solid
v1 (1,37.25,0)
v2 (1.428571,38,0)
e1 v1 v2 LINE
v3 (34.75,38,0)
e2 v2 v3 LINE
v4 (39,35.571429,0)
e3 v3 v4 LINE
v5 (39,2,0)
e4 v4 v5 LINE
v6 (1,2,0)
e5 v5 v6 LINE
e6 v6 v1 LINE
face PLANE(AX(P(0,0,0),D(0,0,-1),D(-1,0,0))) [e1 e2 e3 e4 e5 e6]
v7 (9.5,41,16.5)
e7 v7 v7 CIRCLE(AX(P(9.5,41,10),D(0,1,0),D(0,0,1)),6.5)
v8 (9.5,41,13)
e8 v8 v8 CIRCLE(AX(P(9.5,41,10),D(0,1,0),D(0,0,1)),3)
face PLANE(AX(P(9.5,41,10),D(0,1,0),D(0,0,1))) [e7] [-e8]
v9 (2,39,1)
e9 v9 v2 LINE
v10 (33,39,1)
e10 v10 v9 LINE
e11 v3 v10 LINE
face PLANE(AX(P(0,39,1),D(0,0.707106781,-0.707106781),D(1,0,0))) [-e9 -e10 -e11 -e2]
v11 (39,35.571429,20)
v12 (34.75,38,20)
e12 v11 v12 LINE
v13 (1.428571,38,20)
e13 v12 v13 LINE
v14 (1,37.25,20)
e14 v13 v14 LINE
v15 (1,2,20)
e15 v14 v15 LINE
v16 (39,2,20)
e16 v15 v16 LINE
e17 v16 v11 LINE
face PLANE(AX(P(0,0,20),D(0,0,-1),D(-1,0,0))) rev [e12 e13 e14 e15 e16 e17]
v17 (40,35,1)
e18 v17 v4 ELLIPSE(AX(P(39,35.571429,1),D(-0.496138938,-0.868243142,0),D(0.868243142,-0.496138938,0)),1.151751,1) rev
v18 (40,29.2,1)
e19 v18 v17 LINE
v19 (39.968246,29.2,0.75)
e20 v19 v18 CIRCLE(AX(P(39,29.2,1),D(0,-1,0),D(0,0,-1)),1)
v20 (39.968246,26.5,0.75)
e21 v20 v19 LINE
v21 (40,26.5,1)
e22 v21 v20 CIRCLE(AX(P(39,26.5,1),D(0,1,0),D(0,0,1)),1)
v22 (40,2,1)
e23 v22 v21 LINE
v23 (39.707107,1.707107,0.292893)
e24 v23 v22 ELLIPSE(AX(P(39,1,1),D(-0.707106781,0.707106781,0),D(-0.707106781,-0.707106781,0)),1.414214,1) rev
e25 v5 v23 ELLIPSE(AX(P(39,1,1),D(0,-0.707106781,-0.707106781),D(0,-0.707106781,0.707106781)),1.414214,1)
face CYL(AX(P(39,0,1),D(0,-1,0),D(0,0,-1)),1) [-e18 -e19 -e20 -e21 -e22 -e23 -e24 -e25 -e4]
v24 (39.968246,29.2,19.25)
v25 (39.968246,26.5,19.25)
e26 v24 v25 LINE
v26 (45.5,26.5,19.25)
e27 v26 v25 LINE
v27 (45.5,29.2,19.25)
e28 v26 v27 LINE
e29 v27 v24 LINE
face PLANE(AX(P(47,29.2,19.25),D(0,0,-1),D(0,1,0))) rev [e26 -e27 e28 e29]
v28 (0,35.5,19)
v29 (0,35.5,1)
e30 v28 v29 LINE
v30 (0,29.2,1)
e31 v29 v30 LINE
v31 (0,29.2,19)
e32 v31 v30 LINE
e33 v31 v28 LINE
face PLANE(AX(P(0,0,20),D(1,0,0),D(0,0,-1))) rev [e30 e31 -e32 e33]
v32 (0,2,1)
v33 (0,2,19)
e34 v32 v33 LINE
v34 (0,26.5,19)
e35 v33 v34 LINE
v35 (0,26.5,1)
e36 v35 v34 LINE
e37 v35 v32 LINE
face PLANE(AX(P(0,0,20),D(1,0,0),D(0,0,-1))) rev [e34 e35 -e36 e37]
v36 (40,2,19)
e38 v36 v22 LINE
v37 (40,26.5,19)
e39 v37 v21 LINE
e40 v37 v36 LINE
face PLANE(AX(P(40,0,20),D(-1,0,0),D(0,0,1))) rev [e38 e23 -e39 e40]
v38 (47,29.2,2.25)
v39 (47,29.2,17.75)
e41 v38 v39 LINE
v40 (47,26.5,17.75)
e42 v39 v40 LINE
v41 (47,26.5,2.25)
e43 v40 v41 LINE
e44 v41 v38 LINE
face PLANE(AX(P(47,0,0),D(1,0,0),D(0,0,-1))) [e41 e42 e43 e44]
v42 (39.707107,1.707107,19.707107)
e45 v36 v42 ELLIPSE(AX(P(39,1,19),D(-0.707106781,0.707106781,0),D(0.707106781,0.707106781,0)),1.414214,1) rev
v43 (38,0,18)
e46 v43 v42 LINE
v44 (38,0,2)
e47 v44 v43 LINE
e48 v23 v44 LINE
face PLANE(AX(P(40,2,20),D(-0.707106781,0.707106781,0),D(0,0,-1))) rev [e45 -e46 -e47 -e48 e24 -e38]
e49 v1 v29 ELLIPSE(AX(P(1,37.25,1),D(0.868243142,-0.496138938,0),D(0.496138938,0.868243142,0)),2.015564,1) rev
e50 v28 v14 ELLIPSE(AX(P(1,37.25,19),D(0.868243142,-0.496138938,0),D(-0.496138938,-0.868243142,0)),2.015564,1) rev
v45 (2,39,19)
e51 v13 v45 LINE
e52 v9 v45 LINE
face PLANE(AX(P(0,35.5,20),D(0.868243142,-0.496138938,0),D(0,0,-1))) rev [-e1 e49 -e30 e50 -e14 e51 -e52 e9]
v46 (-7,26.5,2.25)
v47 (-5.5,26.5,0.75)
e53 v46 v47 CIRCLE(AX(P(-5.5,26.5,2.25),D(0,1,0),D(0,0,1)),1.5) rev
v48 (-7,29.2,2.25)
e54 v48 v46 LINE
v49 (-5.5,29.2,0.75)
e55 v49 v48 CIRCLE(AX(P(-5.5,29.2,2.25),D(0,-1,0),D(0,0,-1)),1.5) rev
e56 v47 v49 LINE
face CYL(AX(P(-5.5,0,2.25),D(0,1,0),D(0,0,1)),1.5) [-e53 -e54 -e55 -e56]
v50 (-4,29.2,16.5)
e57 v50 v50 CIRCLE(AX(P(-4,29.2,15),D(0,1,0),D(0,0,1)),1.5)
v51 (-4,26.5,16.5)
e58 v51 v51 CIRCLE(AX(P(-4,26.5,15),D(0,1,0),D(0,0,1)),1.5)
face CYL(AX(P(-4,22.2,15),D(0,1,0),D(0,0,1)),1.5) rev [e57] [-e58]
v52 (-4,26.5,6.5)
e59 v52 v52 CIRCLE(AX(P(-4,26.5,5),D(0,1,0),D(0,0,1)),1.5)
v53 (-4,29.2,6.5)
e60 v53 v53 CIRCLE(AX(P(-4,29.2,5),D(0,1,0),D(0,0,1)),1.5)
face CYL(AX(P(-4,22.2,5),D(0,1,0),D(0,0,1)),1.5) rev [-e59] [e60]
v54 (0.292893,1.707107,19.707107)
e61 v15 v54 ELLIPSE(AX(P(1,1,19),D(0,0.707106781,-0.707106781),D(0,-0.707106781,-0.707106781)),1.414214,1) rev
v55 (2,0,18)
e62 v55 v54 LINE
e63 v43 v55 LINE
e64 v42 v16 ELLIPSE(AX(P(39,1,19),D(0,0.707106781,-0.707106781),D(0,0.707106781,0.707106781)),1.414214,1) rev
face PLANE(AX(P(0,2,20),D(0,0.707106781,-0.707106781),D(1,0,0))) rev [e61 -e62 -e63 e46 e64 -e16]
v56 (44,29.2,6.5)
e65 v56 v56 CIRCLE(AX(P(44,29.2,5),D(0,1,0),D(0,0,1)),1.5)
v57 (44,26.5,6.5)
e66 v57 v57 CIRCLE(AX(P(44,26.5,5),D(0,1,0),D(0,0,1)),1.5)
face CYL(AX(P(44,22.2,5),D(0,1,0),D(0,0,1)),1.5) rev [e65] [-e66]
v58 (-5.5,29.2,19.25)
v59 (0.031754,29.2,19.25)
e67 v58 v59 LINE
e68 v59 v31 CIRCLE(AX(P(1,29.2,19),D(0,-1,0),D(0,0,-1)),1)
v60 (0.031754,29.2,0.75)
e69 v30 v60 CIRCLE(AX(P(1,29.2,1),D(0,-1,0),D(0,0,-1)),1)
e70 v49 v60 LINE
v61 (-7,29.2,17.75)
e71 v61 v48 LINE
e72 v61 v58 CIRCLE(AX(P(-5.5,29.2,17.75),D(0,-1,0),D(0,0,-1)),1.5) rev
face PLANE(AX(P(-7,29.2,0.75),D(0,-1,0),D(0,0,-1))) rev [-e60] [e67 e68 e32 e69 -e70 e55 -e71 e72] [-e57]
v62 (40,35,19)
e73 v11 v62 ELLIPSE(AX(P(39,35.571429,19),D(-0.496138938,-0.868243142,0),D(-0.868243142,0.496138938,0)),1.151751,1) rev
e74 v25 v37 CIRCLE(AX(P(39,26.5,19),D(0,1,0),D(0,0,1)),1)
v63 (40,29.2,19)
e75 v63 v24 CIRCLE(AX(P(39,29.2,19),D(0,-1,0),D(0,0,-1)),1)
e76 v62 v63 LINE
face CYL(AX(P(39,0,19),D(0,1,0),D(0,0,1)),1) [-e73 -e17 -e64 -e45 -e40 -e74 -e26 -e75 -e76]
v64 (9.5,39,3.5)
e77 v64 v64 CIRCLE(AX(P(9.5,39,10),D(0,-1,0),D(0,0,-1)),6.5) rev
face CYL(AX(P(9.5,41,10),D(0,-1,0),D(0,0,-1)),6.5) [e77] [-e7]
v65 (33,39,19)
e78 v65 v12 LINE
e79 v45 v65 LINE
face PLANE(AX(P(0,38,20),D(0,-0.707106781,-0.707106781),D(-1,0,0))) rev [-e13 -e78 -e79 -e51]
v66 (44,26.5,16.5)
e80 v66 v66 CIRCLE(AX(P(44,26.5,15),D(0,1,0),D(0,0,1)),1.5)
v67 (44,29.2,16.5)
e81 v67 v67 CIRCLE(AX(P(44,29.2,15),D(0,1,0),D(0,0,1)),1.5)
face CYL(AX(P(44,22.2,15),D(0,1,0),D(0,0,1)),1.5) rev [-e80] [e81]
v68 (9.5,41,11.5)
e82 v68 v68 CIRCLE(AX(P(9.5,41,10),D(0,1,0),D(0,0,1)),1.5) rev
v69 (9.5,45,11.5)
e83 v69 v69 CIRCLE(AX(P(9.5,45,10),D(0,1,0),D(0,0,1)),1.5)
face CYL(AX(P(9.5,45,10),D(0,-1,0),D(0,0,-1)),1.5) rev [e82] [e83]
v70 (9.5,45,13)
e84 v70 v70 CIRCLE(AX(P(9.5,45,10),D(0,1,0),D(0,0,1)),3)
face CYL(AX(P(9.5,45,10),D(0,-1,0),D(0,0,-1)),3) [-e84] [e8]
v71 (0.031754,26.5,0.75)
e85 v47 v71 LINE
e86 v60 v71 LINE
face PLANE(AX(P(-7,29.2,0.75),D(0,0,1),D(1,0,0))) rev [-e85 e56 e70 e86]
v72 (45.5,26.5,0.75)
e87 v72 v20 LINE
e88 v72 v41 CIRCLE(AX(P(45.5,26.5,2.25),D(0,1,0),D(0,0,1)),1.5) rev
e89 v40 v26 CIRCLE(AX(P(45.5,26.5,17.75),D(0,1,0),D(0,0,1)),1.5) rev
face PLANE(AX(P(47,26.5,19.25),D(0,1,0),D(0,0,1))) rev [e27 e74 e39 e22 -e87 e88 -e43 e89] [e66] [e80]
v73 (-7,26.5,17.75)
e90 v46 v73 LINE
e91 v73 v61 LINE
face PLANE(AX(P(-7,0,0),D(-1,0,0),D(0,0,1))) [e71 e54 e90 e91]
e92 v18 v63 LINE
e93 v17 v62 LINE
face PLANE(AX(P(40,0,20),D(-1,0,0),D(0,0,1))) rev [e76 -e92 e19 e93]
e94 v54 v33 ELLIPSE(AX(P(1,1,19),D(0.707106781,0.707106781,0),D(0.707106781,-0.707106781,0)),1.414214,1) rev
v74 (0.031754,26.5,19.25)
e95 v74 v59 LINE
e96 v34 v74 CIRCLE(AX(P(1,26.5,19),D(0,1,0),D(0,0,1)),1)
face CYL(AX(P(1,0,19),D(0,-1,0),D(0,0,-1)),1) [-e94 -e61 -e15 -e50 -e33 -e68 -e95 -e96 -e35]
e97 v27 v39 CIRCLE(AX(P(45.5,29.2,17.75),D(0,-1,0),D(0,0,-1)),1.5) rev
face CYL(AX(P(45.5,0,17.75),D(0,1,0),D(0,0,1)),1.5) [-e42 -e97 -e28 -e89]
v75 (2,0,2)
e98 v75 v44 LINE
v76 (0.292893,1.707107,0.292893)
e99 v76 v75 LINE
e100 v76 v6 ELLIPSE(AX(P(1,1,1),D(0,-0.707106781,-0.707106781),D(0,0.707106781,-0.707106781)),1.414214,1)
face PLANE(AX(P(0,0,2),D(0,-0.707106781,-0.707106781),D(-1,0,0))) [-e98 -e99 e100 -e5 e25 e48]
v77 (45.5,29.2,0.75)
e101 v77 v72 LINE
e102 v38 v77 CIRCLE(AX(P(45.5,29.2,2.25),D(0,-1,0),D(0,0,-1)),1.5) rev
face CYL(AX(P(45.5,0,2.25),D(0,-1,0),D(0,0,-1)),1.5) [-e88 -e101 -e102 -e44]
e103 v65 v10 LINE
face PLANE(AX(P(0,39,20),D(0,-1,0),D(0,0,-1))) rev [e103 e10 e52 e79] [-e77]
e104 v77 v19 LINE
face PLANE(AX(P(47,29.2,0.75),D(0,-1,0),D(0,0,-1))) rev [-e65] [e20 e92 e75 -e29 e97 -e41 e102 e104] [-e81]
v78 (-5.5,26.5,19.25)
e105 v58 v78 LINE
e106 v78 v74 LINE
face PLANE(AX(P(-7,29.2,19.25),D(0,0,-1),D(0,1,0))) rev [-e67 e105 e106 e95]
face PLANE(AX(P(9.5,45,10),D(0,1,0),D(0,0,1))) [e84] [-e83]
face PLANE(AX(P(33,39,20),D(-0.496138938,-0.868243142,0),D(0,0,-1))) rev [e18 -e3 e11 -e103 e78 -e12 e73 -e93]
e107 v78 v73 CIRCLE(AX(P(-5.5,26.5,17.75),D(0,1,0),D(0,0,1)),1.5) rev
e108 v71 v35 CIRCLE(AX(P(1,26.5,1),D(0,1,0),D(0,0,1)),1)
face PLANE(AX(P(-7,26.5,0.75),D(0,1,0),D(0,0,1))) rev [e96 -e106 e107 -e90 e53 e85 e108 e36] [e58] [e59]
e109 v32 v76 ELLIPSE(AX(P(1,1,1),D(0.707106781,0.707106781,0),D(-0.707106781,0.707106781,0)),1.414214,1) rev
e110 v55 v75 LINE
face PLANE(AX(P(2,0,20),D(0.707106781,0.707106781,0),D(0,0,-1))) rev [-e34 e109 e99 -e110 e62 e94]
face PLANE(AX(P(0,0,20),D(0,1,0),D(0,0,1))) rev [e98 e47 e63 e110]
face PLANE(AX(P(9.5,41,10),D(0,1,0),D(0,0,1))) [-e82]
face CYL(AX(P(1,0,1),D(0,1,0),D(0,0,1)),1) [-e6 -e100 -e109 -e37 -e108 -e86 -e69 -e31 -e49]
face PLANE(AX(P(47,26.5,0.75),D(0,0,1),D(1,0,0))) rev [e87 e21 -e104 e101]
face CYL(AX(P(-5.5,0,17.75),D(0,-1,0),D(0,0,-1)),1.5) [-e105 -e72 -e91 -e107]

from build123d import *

# Parameters (mm, degrees)
SKETCH_1_W          = 40
SKETCH_1_H          = 39
EXTRUDE_1_DEPTH     = 20
SKETCH_2_W          = 18.5
SKETCH_2_H          = 2.7
EXTRUDE_2_DEPTH     = 7
SKETCH_3_W          = 18.5
SKETCH_3_H          = 2.7
EXTRUDE_3_DEPTH     = 7
SKETCH_4_R          = 1.5
CUT_EXTRUDE_1_DEPTH = 7
CHAMFER_1_SIZE      = 2
CHAMFER_2_SIZE      = 2
CHAMFER_2_SIZE2     = 3.5
CHAMFER_3_SIZE      = 4
CHAMFER_3_SIZE2     = 7
CHAMFER_4_SIZE      = 1
SKETCH_5_R          = 6.5
EXTRUDE_4_DEPTH     = 2
SKETCH_6_R          = 3
SKETCH_6_R_2        = 1.5
EXTRUDE_5_DEPTH     = 4
FILLET_1_R          = 1.5
FILLET_2_R          = 1


with BuildPart() as part:
    # 草图1 → 凸台-拉伸1 (new body)
    with BuildSketch(Plane.XY):
        with Locations((20, 19.5)):
            Rectangle(SKETCH_1_W, SKETCH_1_H)
    extrude(amount=EXTRUDE_1_DEPTH)

    # 草图2 → 凸台-拉伸2 (add)
    with BuildSketch(Plane.ZY):
        with Locations((10, 27.85)):
            Rectangle(SKETCH_2_W, SKETCH_2_H)
    extrude(amount=EXTRUDE_2_DEPTH)

    # 草图3 → 凸台-拉伸3 (add)
    with BuildSketch(Plane(origin=(40, 0, 0), x_dir=(0, 0, -1), z_dir=(1, 0, 0))):
        with Locations((-10, 27.85)):
            Rectangle(SKETCH_3_W, SKETCH_3_H)
    extrude(amount=EXTRUDE_3_DEPTH)

    # 草图4 → 切除-拉伸1 (cut)
    with BuildSketch(Plane(origin=(0, 29.2, 0), x_dir=(1, 0, 0), z_dir=(0, 1, 0))):
        with Locations(Location((-4, -5, 0), (0, 0, 270))):
            Circle(SKETCH_4_R)
        with Locations(Location((44, -5, 0), (0, 0, 270))):
            Circle(SKETCH_4_R)
        with Locations(Location((-4, -15, 0), (0, 0, 270))):
            Circle(SKETCH_4_R)
        with Locations(Location((44, -15, 0), (0, 0, 270))):
            Circle(SKETCH_4_R)
    extrude(amount=-CUT_EXTRUDE_1_DEPTH, mode=Mode.SUBTRACT)

    # 倒角1
    chamfer_1_edges = [part.edges().sort_by_distance(p)[0] for p in [
        (20, 0, 0),
        (40, 0, 10),
        (0, 0, 10),
        (20, 0, 20),
    ]]
    chamfer(chamfer_1_edges, length=CHAMFER_1_SIZE)

    # 倒角2
    chamfer_2_edges = [part.edges().sort_by_distance(p)[0] for p in [
        (0, 39, 10),
    ]]
    chamfer_2_side = [part.faces().sort_by_distance(p)[0] for p in [
        (20, 39, 10),
    ]]
    chamfer(chamfer_2_edges, length=CHAMFER_2_SIZE, length2=CHAMFER_2_SIZE2, reference=chamfer_2_side[0])

    # 倒角3
    chamfer_3_edges = [part.edges().sort_by_distance(p)[0] for p in [
        (40, 39, 10),
    ]]
    chamfer_3_side = [part.faces().sort_by_distance(p)[0] for p in [
        (40, 19.967962466, 10),
    ]]
    chamfer(chamfer_3_edges, length=CHAMFER_3_SIZE, length2=CHAMFER_3_SIZE2, reference=chamfer_3_side[0])

    # 倒角4
    chamfer_4_edges = [part.edges().sort_by_distance(p)[0] for p in [
        (17.5, 39, 0),
        (17.5, 39, 20),
    ]]
    chamfer(chamfer_4_edges, length=CHAMFER_4_SIZE)

    # 草图5 → 凸台-拉伸4 (add)
    with BuildSketch(Plane(origin=(0, 39, 0), x_dir=(1, 0, 0), z_dir=(0, 1, 0))):
        with Locations(Location((9.5, -10, 0), (0, 0, 90))):
            Circle(SKETCH_5_R)
    extrude(amount=EXTRUDE_4_DEPTH)

    # 草图6 → 凸台-拉伸5 (add)
    with BuildSketch(Plane(origin=(0, 41, 0), x_dir=(1, 0, 0), z_dir=(0, 1, 0))):
        with Locations(Location((9.5, -10, 0), (0, 0, 270))):
            Circle(SKETCH_6_R)
        with Locations(Location((9.5, -10, 0), (0, 0, 270))):
            Circle(SKETCH_6_R_2, mode=Mode.SUBTRACT)
    extrude(amount=EXTRUDE_5_DEPTH)

    # 圆角1
    fillet_1_edges = [part.edges().sort_by_distance(p)[0] for p in [
        (-7, 27.85, 0.75),
        (-7, 27.85, 19.25),
        (47, 27.85, 19.25),
        (47, 27.85, 0.75),
    ]]
    fillet(fillet_1_edges, radius=FILLET_1_R)

    # 圆角2
    # the kernel refuses this fillet: 1 mm, written as the material it takes off along each edge
    with BuildSketch(Plane(origin=(0, 38, 20), x_dir=(1, 0, 0), z_dir=(0, -1, 0))) as fillet_2_piece_1_section:
        with BuildLine():
            CenterArc((FILLET_2_R, -FILLET_2_R), FILLET_2_R, 90, 90)
            Line((0, -FILLET_2_R), (0, 0))
            Line((0, 0), (FILLET_2_R, 0))
        make_face()
    fillet_2_piece_1 = extrude(amount=38.5, mode=Mode.PRIVATE)
    fillet_2_piece_1 = split(fillet_2_piece_1, bisect_by=Plane(origin=(0.233478453, 29.2, 19.792941909), z_dir=(0, 1, 0)), keep=Keep.TOP, mode=Mode.PRIVATE)
    fillet_2_piece_1 = split(fillet_2_piece_1, bisect_by=Plane(origin=(0.233478453, 33.6, 19.25), z_dir=(0, 0, 1)), keep=Keep.TOP, mode=Mode.PRIVATE)
    add(fillet_2_piece_1, mode=Mode.SUBTRACT)
    with BuildSketch(Plane(origin=(0, 38, 20), x_dir=(1, 0, 0), z_dir=(0, -1, 0))) as fillet_2_piece_2_section:
        with BuildLine():
            CenterArc((FILLET_2_R, -FILLET_2_R), FILLET_2_R, 90, 90)
            Line((0, -FILLET_2_R), (0, 0))
            Line((0, 0), (FILLET_2_R, 0))
        make_face()
    fillet_2_piece_2 = extrude(amount=38.5, mode=Mode.PRIVATE)
    fillet_2_piece_2 = split(fillet_2_piece_2, bisect_by=Plane(origin=(-0.003280029, 29.2, 19.146607635), z_dir=(0, 1, 0)), keep=Keep.TOP, mode=Mode.PRIVATE)
    fillet_2_piece_2 = split(fillet_2_piece_2, bisect_by=Plane(origin=(-0.003280029, 33.6, 19.25), z_dir=(0, 0, -1)), keep=Keep.TOP, mode=Mode.PRIVATE)
    add(fillet_2_piece_2, mode=Mode.SUBTRACT)
    with BuildSketch(Plane(origin=(0, 38, 20), x_dir=(1, 0, 0), z_dir=(0, -1, 0))) as fillet_2_piece_3_section:
        with BuildLine():
            CenterArc((FILLET_2_R, -FILLET_2_R), FILLET_2_R, 90, 90)
            Line((0, -FILLET_2_R), (0, 0))
            Line((0, 0), (FILLET_2_R, 0))
        make_face()
    fillet_2_piece_3 = extrude(amount=38.5, mode=Mode.PRIVATE)
    fillet_2_piece_3 = split(fillet_2_piece_3, bisect_by=Plane(origin=(0.233478453, 29.2, 19.792941909), z_dir=(0, -1, 0)), keep=Keep.TOP, mode=Mode.PRIVATE)
    fillet_2_piece_3 = split(fillet_2_piece_3, bisect_by=Plane(origin=(0.233478453, 27.85, 19.25), z_dir=(0, 0, 1)), keep=Keep.TOP, mode=Mode.PRIVATE)
    fillet_2_piece_3 = split(fillet_2_piece_3, bisect_by=Plane(origin=(0.233478453, 26.5, 19.792941909), z_dir=(0, 1, 0)), keep=Keep.TOP, mode=Mode.PRIVATE)
    add(fillet_2_piece_3, mode=Mode.SUBTRACT)
    with BuildSketch(Plane(origin=(0, 38, 20), x_dir=(1, 0, 0), z_dir=(0, -1, 0))) as fillet_2_piece_4_section:
        with BuildLine():
            CenterArc((FILLET_2_R, -FILLET_2_R), FILLET_2_R, 90, 90)
            Line((0, -FILLET_2_R), (0, 0))
            Line((0, 0), (FILLET_2_R, 0))
        make_face()
    fillet_2_piece_4 = extrude(amount=38.5, mode=Mode.PRIVATE)
    fillet_2_piece_4 = split(fillet_2_piece_4, bisect_by=Plane(origin=(0.233478453, 13, 19.25), z_dir=(0, 0, 1)), keep=Keep.TOP, mode=Mode.PRIVATE)
    fillet_2_piece_4 = split(fillet_2_piece_4, bisect_by=Plane(origin=(0.233478453, 26.5, 19.792941909), z_dir=(0, -1, 0)), keep=Keep.TOP, mode=Mode.PRIVATE)
    add(fillet_2_piece_4, mode=Mode.SUBTRACT)
    with BuildSketch(Plane(origin=(0, 38, 20), x_dir=(1, 0, 0), z_dir=(0, -1, 0))) as fillet_2_piece_5_section:
        with BuildLine():
            CenterArc((FILLET_2_R, -FILLET_2_R), FILLET_2_R, 90, 90)
            Line((0, -FILLET_2_R), (0, 0))
            Line((0, 0), (FILLET_2_R, 0))
        make_face()
    fillet_2_piece_5 = extrude(amount=38.5, mode=Mode.PRIVATE)
    fillet_2_piece_5 = split(fillet_2_piece_5, bisect_by=Plane(origin=(-0.003280029, 13, 19.25), z_dir=(0, 0, -1)), keep=Keep.TOP, mode=Mode.PRIVATE)
    fillet_2_piece_5 = split(fillet_2_piece_5, bisect_by=Plane(origin=(-0.003280029, 26.5, 19.146607635), z_dir=(0, -1, 0)), keep=Keep.TOP, mode=Mode.PRIVATE)
    add(fillet_2_piece_5, mode=Mode.SUBTRACT)
    with BuildSketch(Plane(origin=(0, 38, 0), x_dir=(1, 0, 0), z_dir=(0, -1, 0))) as fillet_2_piece_6_section:
        with BuildLine():
            CenterArc((FILLET_2_R, FILLET_2_R), FILLET_2_R, 180, 90)
            Line((0, FILLET_2_R), (0, 0))
            Line((0, 0), (FILLET_2_R, 0))
        make_face()
    fillet_2_piece_6 = extrude(amount=38.5, mode=Mode.PRIVATE)
    fillet_2_piece_6 = split(fillet_2_piece_6, bisect_by=Plane(origin=(0.233478453, 29.2, 0.207058091), z_dir=(0, 1, 0)), keep=Keep.TOP, mode=Mode.PRIVATE)
    fillet_2_piece_6 = split(fillet_2_piece_6, bisect_by=Plane(origin=(0.233478453, 33.6, 0.75), z_dir=(0, 0, -1)), keep=Keep.TOP, mode=Mode.PRIVATE)
    add(fillet_2_piece_6, mode=Mode.SUBTRACT)
    with BuildSketch(Plane(origin=(0, 38, 0), x_dir=(1, 0, 0), z_dir=(0, -1, 0))) as fillet_2_piece_7_section:
        with BuildLine():
            CenterArc((FILLET_2_R, FILLET_2_R), FILLET_2_R, 180, 90)
            Line((0, FILLET_2_R), (0, 0))
            Line((0, 0), (FILLET_2_R, 0))
        make_face()
    fillet_2_piece_7 = extrude(amount=38.5, mode=Mode.PRIVATE)
    fillet_2_piece_7 = split(fillet_2_piece_7, bisect_by=Plane(origin=(-0.003280029, 29.2, 0.853392365), z_dir=(0, 1, 0)), keep=Keep.TOP, mode=Mode.PRIVATE)
    fillet_2_piece_7 = split(fillet_2_piece_7, bisect_by=Plane(origin=(-0.003280029, 33.6, 0.75), z_dir=(0, 0, 1)), keep=Keep.TOP, mode=Mode.PRIVATE)
    add(fillet_2_piece_7, mode=Mode.SUBTRACT)
    with BuildSketch(Plane(origin=(0, 38, 0), x_dir=(1, 0, 0), z_dir=(0, -1, 0))) as fillet_2_piece_8_section:
        with BuildLine():
            CenterArc((FILLET_2_R, FILLET_2_R), FILLET_2_R, 180, 90)
            Line((0, FILLET_2_R), (0, 0))
            Line((0, 0), (FILLET_2_R, 0))
        make_face()
    fillet_2_piece_8 = extrude(amount=38.5, mode=Mode.PRIVATE)
    fillet_2_piece_8 = split(fillet_2_piece_8, bisect_by=Plane(origin=(0.233478453, 29.2, 0.207058091), z_dir=(0, -1, 0)), keep=Keep.TOP, mode=Mode.PRIVATE)
    fillet_2_piece_8 = split(fillet_2_piece_8, bisect_by=Plane(origin=(0.233478453, 26.5, 0.207058091), z_dir=(0, 1, 0)), keep=Keep.TOP, mode=Mode.PRIVATE)
    fillet_2_piece_8 = split(fillet_2_piece_8, bisect_by=Plane(origin=(0.233478453, 27.85, 0.75), z_dir=(0, 0, -1)), keep=Keep.TOP, mode=Mode.PRIVATE)
    add(fillet_2_piece_8, mode=Mode.SUBTRACT)
    with BuildSketch(Plane(origin=(0, 38, 0), x_dir=(1, 0, 0), z_dir=(0, -1, 0))) as fillet_2_piece_9_section:
        with BuildLine():
            CenterArc((FILLET_2_R, FILLET_2_R), FILLET_2_R, 180, 90)
            Line((0, FILLET_2_R), (0, 0))
            Line((0, 0), (FILLET_2_R, 0))
        make_face()
    fillet_2_piece_9 = extrude(amount=38.5, mode=Mode.PRIVATE)
    fillet_2_piece_9 = split(fillet_2_piece_9, bisect_by=Plane(origin=(0.233478453, 26.5, 0.207058091), z_dir=(0, -1, 0)), keep=Keep.TOP, mode=Mode.PRIVATE)
    fillet_2_piece_9 = split(fillet_2_piece_9, bisect_by=Plane(origin=(0.233478453, 13, 0.75), z_dir=(0, 0, -1)), keep=Keep.TOP, mode=Mode.PRIVATE)
    add(fillet_2_piece_9, mode=Mode.SUBTRACT)
    with BuildSketch(Plane(origin=(0, 38, 0), x_dir=(1, 0, 0), z_dir=(0, -1, 0))) as fillet_2_piece_10_section:
        with BuildLine():
            CenterArc((FILLET_2_R, FILLET_2_R), FILLET_2_R, 180, 90)
            Line((0, FILLET_2_R), (0, 0))
            Line((0, 0), (FILLET_2_R, 0))
        make_face()
    fillet_2_piece_10 = extrude(amount=38.5, mode=Mode.PRIVATE)
    fillet_2_piece_10 = split(fillet_2_piece_10, bisect_by=Plane(origin=(-0.003280029, 26.5, 0.853392365), z_dir=(0, -1, 0)), keep=Keep.TOP, mode=Mode.PRIVATE)
    fillet_2_piece_10 = split(fillet_2_piece_10, bisect_by=Plane(origin=(-0.003280029, 13, 0.75), z_dir=(0, 0, 1)), keep=Keep.TOP, mode=Mode.PRIVATE)
    add(fillet_2_piece_10, mode=Mode.SUBTRACT)
    with BuildSketch(Plane(origin=(40, -0.5, 0), x_dir=(0, 0, 1), z_dir=(0, 1, 0))) as fillet_2_piece_11_section:
        with BuildLine():
            CenterArc((FILLET_2_R, -FILLET_2_R), FILLET_2_R, 90, 90)
            Line((0, -FILLET_2_R), (0, 0))
            Line((0, 0), (FILLET_2_R, 0))
        make_face()
    fillet_2_piece_11 = extrude(amount=38, mode=Mode.PRIVATE)
    fillet_2_piece_11 = split(fillet_2_piece_11, bisect_by=Plane(origin=(40.003280029, 26.5, 0.853392365), z_dir=(0, -1, 0)), keep=Keep.TOP, mode=Mode.PRIVATE)
    fillet_2_piece_11 = split(fillet_2_piece_11, bisect_by=Plane(origin=(40.003280029, 13, 0.75), z_dir=(0, 0, 1)), keep=Keep.TOP, mode=Mode.PRIVATE)
    add(fillet_2_piece_11, mode=Mode.SUBTRACT)
    with BuildSketch(Plane(origin=(40, -0.5, 0), x_dir=(0, 0, 1), z_dir=(0, 1, 0))) as fillet_2_piece_12_section:
        with BuildLine():
            CenterArc((FILLET_2_R, -FILLET_2_R), FILLET_2_R, 90, 90)
            Line((0, -FILLET_2_R), (0, 0))
            Line((0, 0), (FILLET_2_R, 0))
        make_face()
    fillet_2_piece_12 = extrude(amount=38, mode=Mode.PRIVATE)
    fillet_2_piece_12 = split(fillet_2_piece_12, bisect_by=Plane(origin=(39.766521547, 26.5, 0.207058091), z_dir=(0, -1, 0)), keep=Keep.TOP, mode=Mode.PRIVATE)
    fillet_2_piece_12 = split(fillet_2_piece_12, bisect_by=Plane(origin=(39.766521547, 13, 0.75), z_dir=(0, 0, -1)), keep=Keep.TOP, mode=Mode.PRIVATE)
    add(fillet_2_piece_12, mode=Mode.SUBTRACT)
    with BuildSketch(Plane(origin=(40, -0.5, 0), x_dir=(0, 0, 1), z_dir=(0, 1, 0))) as fillet_2_piece_13_section:
        with BuildLine():
            CenterArc((FILLET_2_R, -FILLET_2_R), FILLET_2_R, 90, 90)
            Line((0, -FILLET_2_R), (0, 0))
            Line((0, 0), (FILLET_2_R, 0))
        make_face()
    fillet_2_piece_13 = extrude(amount=38, mode=Mode.PRIVATE)
    fillet_2_piece_13 = split(fillet_2_piece_13, bisect_by=Plane(origin=(39.766521547, 26.5, 0.207058091), z_dir=(0, 1, 0)), keep=Keep.TOP, mode=Mode.PRIVATE)
    fillet_2_piece_13 = split(fillet_2_piece_13, bisect_by=Plane(origin=(39.766521547, 29.2, 0.207058091), z_dir=(0, -1, 0)), keep=Keep.TOP, mode=Mode.PRIVATE)
    fillet_2_piece_13 = split(fillet_2_piece_13, bisect_by=Plane(origin=(39.766521547, 27.85, 0.75), z_dir=(0, 0, -1)), keep=Keep.TOP, mode=Mode.PRIVATE)
    add(fillet_2_piece_13, mode=Mode.SUBTRACT)
    with BuildSketch(Plane(origin=(40, -0.5, 0), x_dir=(0, 0, 1), z_dir=(0, 1, 0))) as fillet_2_piece_14_section:
        with BuildLine():
            CenterArc((FILLET_2_R, -FILLET_2_R), FILLET_2_R, 90, 90)
            Line((0, -FILLET_2_R), (0, 0))
            Line((0, 0), (FILLET_2_R, 0))
        make_face()
    fillet_2_piece_14 = extrude(amount=38, mode=Mode.PRIVATE)
    fillet_2_piece_14 = split(fillet_2_piece_14, bisect_by=Plane(origin=(40.003280029, 29.2, 0.853392365), z_dir=(0, 1, 0)), keep=Keep.TOP, mode=Mode.PRIVATE)
    fillet_2_piece_14 = split(fillet_2_piece_14, bisect_by=Plane(origin=(40.003280029, 33.35, 0.75), z_dir=(0, 0, 1)), keep=Keep.TOP, mode=Mode.PRIVATE)
    add(fillet_2_piece_14, mode=Mode.SUBTRACT)
    with BuildSketch(Plane(origin=(40, -0.5, 0), x_dir=(0, 0, 1), z_dir=(0, 1, 0))) as fillet_2_piece_15_section:
        with BuildLine():
            CenterArc((FILLET_2_R, -FILLET_2_R), FILLET_2_R, 90, 90)
            Line((0, -FILLET_2_R), (0, 0))
            Line((0, 0), (FILLET_2_R, 0))
        make_face()
    fillet_2_piece_15 = extrude(amount=38, mode=Mode.PRIVATE)
    fillet_2_piece_15 = split(fillet_2_piece_15, bisect_by=Plane(origin=(39.766521547, 29.2, 0.207058091), z_dir=(0, 1, 0)), keep=Keep.TOP, mode=Mode.PRIVATE)
    fillet_2_piece_15 = split(fillet_2_piece_15, bisect_by=Plane(origin=(39.766521547, 33.35, 0.75), z_dir=(0, 0, -1)), keep=Keep.TOP, mode=Mode.PRIVATE)
    add(fillet_2_piece_15, mode=Mode.SUBTRACT)
    with BuildSketch(Plane(origin=(40, -0.5, 20), x_dir=(0, 0, -1), z_dir=(0, 1, 0))) as fillet_2_piece_16_section:
        with BuildLine():
            CenterArc((FILLET_2_R, FILLET_2_R), FILLET_2_R, 180, 90)
            Line((0, FILLET_2_R), (0, 0))
            Line((0, 0), (FILLET_2_R, 0))
        make_face()
    fillet_2_piece_16 = extrude(amount=38, mode=Mode.PRIVATE)
    fillet_2_piece_16 = split(fillet_2_piece_16, bisect_by=Plane(origin=(40.003280029, 26.5, 19.146607635), z_dir=(0, -1, 0)), keep=Keep.TOP, mode=Mode.PRIVATE)
    fillet_2_piece_16 = split(fillet_2_piece_16, bisect_by=Plane(origin=(40.003280029, 13, 19.25), z_dir=(0, 0, -1)), keep=Keep.TOP, mode=Mode.PRIVATE)
    add(fillet_2_piece_16, mode=Mode.SUBTRACT)
    with BuildSketch(Plane(origin=(40, -0.5, 20), x_dir=(0, 0, -1), z_dir=(0, 1, 0))) as fillet_2_piece_17_section:
        with BuildLine():
            CenterArc((FILLET_2_R, FILLET_2_R), FILLET_2_R, 180, 90)
            Line((0, FILLET_2_R), (0, 0))
            Line((0, 0), (FILLET_2_R, 0))
        make_face()
    fillet_2_piece_17 = extrude(amount=38, mode=Mode.PRIVATE)
    fillet_2_piece_17 = split(fillet_2_piece_17, bisect_by=Plane(origin=(39.766521547, 26.5, 19.792941909), z_dir=(0, -1, 0)), keep=Keep.TOP, mode=Mode.PRIVATE)
    fillet_2_piece_17 = split(fillet_2_piece_17, bisect_by=Plane(origin=(39.766521547, 13, 19.25), z_dir=(0, 0, 1)), keep=Keep.TOP, mode=Mode.PRIVATE)
    add(fillet_2_piece_17, mode=Mode.SUBTRACT)
    with BuildSketch(Plane(origin=(40, -0.5, 20), x_dir=(0, 0, -1), z_dir=(0, 1, 0))) as fillet_2_piece_18_section:
        with BuildLine():
            CenterArc((FILLET_2_R, FILLET_2_R), FILLET_2_R, 180, 90)
            Line((0, FILLET_2_R), (0, 0))
            Line((0, 0), (FILLET_2_R, 0))
        make_face()
    fillet_2_piece_18 = extrude(amount=38, mode=Mode.PRIVATE)
    fillet_2_piece_18 = split(fillet_2_piece_18, bisect_by=Plane(origin=(39.766521547, 26.5, 19.792941909), z_dir=(0, 1, 0)), keep=Keep.TOP, mode=Mode.PRIVATE)
    fillet_2_piece_18 = split(fillet_2_piece_18, bisect_by=Plane(origin=(39.766521547, 27.85, 19.25), z_dir=(0, 0, 1)), keep=Keep.TOP, mode=Mode.PRIVATE)
    fillet_2_piece_18 = split(fillet_2_piece_18, bisect_by=Plane(origin=(39.766521547, 29.2, 19.792941909), z_dir=(0, -1, 0)), keep=Keep.TOP, mode=Mode.PRIVATE)
    add(fillet_2_piece_18, mode=Mode.SUBTRACT)
    with BuildSketch(Plane(origin=(40, -0.5, 20), x_dir=(0, 0, -1), z_dir=(0, 1, 0))) as fillet_2_piece_19_section:
        with BuildLine():
            CenterArc((FILLET_2_R, FILLET_2_R), FILLET_2_R, 180, 90)
            Line((0, FILLET_2_R), (0, 0))
            Line((0, 0), (FILLET_2_R, 0))
        make_face()
    fillet_2_piece_19 = extrude(amount=38, mode=Mode.PRIVATE)
    fillet_2_piece_19 = split(fillet_2_piece_19, bisect_by=Plane(origin=(40.003280029, 33.35, 19.25), z_dir=(0, 0, -1)), keep=Keep.TOP, mode=Mode.PRIVATE)
    fillet_2_piece_19 = split(fillet_2_piece_19, bisect_by=Plane(origin=(40.003280029, 29.2, 19.146607635), z_dir=(0, 1, 0)), keep=Keep.TOP, mode=Mode.PRIVATE)
    add(fillet_2_piece_19, mode=Mode.SUBTRACT)
    with BuildSketch(Plane(origin=(40, -0.5, 20), x_dir=(0, 0, -1), z_dir=(0, 1, 0))) as fillet_2_piece_20_section:
        with BuildLine():
            CenterArc((FILLET_2_R, FILLET_2_R), FILLET_2_R, 180, 90)
            Line((0, FILLET_2_R), (0, 0))
            Line((0, 0), (FILLET_2_R, 0))
        make_face()
    fillet_2_piece_20 = extrude(amount=38, mode=Mode.PRIVATE)
    fillet_2_piece_20 = split(fillet_2_piece_20, bisect_by=Plane(origin=(39.766521547, 33.35, 19.25), z_dir=(0, 0, 1)), keep=Keep.TOP, mode=Mode.PRIVATE)
    fillet_2_piece_20 = split(fillet_2_piece_20, bisect_by=Plane(origin=(39.766521547, 29.2, 19.792941909), z_dir=(0, 1, 0)), keep=Keep.TOP, mode=Mode.PRIVATE)
    add(fillet_2_piece_20, mode=Mode.SUBTRACT)


solid = part.part
